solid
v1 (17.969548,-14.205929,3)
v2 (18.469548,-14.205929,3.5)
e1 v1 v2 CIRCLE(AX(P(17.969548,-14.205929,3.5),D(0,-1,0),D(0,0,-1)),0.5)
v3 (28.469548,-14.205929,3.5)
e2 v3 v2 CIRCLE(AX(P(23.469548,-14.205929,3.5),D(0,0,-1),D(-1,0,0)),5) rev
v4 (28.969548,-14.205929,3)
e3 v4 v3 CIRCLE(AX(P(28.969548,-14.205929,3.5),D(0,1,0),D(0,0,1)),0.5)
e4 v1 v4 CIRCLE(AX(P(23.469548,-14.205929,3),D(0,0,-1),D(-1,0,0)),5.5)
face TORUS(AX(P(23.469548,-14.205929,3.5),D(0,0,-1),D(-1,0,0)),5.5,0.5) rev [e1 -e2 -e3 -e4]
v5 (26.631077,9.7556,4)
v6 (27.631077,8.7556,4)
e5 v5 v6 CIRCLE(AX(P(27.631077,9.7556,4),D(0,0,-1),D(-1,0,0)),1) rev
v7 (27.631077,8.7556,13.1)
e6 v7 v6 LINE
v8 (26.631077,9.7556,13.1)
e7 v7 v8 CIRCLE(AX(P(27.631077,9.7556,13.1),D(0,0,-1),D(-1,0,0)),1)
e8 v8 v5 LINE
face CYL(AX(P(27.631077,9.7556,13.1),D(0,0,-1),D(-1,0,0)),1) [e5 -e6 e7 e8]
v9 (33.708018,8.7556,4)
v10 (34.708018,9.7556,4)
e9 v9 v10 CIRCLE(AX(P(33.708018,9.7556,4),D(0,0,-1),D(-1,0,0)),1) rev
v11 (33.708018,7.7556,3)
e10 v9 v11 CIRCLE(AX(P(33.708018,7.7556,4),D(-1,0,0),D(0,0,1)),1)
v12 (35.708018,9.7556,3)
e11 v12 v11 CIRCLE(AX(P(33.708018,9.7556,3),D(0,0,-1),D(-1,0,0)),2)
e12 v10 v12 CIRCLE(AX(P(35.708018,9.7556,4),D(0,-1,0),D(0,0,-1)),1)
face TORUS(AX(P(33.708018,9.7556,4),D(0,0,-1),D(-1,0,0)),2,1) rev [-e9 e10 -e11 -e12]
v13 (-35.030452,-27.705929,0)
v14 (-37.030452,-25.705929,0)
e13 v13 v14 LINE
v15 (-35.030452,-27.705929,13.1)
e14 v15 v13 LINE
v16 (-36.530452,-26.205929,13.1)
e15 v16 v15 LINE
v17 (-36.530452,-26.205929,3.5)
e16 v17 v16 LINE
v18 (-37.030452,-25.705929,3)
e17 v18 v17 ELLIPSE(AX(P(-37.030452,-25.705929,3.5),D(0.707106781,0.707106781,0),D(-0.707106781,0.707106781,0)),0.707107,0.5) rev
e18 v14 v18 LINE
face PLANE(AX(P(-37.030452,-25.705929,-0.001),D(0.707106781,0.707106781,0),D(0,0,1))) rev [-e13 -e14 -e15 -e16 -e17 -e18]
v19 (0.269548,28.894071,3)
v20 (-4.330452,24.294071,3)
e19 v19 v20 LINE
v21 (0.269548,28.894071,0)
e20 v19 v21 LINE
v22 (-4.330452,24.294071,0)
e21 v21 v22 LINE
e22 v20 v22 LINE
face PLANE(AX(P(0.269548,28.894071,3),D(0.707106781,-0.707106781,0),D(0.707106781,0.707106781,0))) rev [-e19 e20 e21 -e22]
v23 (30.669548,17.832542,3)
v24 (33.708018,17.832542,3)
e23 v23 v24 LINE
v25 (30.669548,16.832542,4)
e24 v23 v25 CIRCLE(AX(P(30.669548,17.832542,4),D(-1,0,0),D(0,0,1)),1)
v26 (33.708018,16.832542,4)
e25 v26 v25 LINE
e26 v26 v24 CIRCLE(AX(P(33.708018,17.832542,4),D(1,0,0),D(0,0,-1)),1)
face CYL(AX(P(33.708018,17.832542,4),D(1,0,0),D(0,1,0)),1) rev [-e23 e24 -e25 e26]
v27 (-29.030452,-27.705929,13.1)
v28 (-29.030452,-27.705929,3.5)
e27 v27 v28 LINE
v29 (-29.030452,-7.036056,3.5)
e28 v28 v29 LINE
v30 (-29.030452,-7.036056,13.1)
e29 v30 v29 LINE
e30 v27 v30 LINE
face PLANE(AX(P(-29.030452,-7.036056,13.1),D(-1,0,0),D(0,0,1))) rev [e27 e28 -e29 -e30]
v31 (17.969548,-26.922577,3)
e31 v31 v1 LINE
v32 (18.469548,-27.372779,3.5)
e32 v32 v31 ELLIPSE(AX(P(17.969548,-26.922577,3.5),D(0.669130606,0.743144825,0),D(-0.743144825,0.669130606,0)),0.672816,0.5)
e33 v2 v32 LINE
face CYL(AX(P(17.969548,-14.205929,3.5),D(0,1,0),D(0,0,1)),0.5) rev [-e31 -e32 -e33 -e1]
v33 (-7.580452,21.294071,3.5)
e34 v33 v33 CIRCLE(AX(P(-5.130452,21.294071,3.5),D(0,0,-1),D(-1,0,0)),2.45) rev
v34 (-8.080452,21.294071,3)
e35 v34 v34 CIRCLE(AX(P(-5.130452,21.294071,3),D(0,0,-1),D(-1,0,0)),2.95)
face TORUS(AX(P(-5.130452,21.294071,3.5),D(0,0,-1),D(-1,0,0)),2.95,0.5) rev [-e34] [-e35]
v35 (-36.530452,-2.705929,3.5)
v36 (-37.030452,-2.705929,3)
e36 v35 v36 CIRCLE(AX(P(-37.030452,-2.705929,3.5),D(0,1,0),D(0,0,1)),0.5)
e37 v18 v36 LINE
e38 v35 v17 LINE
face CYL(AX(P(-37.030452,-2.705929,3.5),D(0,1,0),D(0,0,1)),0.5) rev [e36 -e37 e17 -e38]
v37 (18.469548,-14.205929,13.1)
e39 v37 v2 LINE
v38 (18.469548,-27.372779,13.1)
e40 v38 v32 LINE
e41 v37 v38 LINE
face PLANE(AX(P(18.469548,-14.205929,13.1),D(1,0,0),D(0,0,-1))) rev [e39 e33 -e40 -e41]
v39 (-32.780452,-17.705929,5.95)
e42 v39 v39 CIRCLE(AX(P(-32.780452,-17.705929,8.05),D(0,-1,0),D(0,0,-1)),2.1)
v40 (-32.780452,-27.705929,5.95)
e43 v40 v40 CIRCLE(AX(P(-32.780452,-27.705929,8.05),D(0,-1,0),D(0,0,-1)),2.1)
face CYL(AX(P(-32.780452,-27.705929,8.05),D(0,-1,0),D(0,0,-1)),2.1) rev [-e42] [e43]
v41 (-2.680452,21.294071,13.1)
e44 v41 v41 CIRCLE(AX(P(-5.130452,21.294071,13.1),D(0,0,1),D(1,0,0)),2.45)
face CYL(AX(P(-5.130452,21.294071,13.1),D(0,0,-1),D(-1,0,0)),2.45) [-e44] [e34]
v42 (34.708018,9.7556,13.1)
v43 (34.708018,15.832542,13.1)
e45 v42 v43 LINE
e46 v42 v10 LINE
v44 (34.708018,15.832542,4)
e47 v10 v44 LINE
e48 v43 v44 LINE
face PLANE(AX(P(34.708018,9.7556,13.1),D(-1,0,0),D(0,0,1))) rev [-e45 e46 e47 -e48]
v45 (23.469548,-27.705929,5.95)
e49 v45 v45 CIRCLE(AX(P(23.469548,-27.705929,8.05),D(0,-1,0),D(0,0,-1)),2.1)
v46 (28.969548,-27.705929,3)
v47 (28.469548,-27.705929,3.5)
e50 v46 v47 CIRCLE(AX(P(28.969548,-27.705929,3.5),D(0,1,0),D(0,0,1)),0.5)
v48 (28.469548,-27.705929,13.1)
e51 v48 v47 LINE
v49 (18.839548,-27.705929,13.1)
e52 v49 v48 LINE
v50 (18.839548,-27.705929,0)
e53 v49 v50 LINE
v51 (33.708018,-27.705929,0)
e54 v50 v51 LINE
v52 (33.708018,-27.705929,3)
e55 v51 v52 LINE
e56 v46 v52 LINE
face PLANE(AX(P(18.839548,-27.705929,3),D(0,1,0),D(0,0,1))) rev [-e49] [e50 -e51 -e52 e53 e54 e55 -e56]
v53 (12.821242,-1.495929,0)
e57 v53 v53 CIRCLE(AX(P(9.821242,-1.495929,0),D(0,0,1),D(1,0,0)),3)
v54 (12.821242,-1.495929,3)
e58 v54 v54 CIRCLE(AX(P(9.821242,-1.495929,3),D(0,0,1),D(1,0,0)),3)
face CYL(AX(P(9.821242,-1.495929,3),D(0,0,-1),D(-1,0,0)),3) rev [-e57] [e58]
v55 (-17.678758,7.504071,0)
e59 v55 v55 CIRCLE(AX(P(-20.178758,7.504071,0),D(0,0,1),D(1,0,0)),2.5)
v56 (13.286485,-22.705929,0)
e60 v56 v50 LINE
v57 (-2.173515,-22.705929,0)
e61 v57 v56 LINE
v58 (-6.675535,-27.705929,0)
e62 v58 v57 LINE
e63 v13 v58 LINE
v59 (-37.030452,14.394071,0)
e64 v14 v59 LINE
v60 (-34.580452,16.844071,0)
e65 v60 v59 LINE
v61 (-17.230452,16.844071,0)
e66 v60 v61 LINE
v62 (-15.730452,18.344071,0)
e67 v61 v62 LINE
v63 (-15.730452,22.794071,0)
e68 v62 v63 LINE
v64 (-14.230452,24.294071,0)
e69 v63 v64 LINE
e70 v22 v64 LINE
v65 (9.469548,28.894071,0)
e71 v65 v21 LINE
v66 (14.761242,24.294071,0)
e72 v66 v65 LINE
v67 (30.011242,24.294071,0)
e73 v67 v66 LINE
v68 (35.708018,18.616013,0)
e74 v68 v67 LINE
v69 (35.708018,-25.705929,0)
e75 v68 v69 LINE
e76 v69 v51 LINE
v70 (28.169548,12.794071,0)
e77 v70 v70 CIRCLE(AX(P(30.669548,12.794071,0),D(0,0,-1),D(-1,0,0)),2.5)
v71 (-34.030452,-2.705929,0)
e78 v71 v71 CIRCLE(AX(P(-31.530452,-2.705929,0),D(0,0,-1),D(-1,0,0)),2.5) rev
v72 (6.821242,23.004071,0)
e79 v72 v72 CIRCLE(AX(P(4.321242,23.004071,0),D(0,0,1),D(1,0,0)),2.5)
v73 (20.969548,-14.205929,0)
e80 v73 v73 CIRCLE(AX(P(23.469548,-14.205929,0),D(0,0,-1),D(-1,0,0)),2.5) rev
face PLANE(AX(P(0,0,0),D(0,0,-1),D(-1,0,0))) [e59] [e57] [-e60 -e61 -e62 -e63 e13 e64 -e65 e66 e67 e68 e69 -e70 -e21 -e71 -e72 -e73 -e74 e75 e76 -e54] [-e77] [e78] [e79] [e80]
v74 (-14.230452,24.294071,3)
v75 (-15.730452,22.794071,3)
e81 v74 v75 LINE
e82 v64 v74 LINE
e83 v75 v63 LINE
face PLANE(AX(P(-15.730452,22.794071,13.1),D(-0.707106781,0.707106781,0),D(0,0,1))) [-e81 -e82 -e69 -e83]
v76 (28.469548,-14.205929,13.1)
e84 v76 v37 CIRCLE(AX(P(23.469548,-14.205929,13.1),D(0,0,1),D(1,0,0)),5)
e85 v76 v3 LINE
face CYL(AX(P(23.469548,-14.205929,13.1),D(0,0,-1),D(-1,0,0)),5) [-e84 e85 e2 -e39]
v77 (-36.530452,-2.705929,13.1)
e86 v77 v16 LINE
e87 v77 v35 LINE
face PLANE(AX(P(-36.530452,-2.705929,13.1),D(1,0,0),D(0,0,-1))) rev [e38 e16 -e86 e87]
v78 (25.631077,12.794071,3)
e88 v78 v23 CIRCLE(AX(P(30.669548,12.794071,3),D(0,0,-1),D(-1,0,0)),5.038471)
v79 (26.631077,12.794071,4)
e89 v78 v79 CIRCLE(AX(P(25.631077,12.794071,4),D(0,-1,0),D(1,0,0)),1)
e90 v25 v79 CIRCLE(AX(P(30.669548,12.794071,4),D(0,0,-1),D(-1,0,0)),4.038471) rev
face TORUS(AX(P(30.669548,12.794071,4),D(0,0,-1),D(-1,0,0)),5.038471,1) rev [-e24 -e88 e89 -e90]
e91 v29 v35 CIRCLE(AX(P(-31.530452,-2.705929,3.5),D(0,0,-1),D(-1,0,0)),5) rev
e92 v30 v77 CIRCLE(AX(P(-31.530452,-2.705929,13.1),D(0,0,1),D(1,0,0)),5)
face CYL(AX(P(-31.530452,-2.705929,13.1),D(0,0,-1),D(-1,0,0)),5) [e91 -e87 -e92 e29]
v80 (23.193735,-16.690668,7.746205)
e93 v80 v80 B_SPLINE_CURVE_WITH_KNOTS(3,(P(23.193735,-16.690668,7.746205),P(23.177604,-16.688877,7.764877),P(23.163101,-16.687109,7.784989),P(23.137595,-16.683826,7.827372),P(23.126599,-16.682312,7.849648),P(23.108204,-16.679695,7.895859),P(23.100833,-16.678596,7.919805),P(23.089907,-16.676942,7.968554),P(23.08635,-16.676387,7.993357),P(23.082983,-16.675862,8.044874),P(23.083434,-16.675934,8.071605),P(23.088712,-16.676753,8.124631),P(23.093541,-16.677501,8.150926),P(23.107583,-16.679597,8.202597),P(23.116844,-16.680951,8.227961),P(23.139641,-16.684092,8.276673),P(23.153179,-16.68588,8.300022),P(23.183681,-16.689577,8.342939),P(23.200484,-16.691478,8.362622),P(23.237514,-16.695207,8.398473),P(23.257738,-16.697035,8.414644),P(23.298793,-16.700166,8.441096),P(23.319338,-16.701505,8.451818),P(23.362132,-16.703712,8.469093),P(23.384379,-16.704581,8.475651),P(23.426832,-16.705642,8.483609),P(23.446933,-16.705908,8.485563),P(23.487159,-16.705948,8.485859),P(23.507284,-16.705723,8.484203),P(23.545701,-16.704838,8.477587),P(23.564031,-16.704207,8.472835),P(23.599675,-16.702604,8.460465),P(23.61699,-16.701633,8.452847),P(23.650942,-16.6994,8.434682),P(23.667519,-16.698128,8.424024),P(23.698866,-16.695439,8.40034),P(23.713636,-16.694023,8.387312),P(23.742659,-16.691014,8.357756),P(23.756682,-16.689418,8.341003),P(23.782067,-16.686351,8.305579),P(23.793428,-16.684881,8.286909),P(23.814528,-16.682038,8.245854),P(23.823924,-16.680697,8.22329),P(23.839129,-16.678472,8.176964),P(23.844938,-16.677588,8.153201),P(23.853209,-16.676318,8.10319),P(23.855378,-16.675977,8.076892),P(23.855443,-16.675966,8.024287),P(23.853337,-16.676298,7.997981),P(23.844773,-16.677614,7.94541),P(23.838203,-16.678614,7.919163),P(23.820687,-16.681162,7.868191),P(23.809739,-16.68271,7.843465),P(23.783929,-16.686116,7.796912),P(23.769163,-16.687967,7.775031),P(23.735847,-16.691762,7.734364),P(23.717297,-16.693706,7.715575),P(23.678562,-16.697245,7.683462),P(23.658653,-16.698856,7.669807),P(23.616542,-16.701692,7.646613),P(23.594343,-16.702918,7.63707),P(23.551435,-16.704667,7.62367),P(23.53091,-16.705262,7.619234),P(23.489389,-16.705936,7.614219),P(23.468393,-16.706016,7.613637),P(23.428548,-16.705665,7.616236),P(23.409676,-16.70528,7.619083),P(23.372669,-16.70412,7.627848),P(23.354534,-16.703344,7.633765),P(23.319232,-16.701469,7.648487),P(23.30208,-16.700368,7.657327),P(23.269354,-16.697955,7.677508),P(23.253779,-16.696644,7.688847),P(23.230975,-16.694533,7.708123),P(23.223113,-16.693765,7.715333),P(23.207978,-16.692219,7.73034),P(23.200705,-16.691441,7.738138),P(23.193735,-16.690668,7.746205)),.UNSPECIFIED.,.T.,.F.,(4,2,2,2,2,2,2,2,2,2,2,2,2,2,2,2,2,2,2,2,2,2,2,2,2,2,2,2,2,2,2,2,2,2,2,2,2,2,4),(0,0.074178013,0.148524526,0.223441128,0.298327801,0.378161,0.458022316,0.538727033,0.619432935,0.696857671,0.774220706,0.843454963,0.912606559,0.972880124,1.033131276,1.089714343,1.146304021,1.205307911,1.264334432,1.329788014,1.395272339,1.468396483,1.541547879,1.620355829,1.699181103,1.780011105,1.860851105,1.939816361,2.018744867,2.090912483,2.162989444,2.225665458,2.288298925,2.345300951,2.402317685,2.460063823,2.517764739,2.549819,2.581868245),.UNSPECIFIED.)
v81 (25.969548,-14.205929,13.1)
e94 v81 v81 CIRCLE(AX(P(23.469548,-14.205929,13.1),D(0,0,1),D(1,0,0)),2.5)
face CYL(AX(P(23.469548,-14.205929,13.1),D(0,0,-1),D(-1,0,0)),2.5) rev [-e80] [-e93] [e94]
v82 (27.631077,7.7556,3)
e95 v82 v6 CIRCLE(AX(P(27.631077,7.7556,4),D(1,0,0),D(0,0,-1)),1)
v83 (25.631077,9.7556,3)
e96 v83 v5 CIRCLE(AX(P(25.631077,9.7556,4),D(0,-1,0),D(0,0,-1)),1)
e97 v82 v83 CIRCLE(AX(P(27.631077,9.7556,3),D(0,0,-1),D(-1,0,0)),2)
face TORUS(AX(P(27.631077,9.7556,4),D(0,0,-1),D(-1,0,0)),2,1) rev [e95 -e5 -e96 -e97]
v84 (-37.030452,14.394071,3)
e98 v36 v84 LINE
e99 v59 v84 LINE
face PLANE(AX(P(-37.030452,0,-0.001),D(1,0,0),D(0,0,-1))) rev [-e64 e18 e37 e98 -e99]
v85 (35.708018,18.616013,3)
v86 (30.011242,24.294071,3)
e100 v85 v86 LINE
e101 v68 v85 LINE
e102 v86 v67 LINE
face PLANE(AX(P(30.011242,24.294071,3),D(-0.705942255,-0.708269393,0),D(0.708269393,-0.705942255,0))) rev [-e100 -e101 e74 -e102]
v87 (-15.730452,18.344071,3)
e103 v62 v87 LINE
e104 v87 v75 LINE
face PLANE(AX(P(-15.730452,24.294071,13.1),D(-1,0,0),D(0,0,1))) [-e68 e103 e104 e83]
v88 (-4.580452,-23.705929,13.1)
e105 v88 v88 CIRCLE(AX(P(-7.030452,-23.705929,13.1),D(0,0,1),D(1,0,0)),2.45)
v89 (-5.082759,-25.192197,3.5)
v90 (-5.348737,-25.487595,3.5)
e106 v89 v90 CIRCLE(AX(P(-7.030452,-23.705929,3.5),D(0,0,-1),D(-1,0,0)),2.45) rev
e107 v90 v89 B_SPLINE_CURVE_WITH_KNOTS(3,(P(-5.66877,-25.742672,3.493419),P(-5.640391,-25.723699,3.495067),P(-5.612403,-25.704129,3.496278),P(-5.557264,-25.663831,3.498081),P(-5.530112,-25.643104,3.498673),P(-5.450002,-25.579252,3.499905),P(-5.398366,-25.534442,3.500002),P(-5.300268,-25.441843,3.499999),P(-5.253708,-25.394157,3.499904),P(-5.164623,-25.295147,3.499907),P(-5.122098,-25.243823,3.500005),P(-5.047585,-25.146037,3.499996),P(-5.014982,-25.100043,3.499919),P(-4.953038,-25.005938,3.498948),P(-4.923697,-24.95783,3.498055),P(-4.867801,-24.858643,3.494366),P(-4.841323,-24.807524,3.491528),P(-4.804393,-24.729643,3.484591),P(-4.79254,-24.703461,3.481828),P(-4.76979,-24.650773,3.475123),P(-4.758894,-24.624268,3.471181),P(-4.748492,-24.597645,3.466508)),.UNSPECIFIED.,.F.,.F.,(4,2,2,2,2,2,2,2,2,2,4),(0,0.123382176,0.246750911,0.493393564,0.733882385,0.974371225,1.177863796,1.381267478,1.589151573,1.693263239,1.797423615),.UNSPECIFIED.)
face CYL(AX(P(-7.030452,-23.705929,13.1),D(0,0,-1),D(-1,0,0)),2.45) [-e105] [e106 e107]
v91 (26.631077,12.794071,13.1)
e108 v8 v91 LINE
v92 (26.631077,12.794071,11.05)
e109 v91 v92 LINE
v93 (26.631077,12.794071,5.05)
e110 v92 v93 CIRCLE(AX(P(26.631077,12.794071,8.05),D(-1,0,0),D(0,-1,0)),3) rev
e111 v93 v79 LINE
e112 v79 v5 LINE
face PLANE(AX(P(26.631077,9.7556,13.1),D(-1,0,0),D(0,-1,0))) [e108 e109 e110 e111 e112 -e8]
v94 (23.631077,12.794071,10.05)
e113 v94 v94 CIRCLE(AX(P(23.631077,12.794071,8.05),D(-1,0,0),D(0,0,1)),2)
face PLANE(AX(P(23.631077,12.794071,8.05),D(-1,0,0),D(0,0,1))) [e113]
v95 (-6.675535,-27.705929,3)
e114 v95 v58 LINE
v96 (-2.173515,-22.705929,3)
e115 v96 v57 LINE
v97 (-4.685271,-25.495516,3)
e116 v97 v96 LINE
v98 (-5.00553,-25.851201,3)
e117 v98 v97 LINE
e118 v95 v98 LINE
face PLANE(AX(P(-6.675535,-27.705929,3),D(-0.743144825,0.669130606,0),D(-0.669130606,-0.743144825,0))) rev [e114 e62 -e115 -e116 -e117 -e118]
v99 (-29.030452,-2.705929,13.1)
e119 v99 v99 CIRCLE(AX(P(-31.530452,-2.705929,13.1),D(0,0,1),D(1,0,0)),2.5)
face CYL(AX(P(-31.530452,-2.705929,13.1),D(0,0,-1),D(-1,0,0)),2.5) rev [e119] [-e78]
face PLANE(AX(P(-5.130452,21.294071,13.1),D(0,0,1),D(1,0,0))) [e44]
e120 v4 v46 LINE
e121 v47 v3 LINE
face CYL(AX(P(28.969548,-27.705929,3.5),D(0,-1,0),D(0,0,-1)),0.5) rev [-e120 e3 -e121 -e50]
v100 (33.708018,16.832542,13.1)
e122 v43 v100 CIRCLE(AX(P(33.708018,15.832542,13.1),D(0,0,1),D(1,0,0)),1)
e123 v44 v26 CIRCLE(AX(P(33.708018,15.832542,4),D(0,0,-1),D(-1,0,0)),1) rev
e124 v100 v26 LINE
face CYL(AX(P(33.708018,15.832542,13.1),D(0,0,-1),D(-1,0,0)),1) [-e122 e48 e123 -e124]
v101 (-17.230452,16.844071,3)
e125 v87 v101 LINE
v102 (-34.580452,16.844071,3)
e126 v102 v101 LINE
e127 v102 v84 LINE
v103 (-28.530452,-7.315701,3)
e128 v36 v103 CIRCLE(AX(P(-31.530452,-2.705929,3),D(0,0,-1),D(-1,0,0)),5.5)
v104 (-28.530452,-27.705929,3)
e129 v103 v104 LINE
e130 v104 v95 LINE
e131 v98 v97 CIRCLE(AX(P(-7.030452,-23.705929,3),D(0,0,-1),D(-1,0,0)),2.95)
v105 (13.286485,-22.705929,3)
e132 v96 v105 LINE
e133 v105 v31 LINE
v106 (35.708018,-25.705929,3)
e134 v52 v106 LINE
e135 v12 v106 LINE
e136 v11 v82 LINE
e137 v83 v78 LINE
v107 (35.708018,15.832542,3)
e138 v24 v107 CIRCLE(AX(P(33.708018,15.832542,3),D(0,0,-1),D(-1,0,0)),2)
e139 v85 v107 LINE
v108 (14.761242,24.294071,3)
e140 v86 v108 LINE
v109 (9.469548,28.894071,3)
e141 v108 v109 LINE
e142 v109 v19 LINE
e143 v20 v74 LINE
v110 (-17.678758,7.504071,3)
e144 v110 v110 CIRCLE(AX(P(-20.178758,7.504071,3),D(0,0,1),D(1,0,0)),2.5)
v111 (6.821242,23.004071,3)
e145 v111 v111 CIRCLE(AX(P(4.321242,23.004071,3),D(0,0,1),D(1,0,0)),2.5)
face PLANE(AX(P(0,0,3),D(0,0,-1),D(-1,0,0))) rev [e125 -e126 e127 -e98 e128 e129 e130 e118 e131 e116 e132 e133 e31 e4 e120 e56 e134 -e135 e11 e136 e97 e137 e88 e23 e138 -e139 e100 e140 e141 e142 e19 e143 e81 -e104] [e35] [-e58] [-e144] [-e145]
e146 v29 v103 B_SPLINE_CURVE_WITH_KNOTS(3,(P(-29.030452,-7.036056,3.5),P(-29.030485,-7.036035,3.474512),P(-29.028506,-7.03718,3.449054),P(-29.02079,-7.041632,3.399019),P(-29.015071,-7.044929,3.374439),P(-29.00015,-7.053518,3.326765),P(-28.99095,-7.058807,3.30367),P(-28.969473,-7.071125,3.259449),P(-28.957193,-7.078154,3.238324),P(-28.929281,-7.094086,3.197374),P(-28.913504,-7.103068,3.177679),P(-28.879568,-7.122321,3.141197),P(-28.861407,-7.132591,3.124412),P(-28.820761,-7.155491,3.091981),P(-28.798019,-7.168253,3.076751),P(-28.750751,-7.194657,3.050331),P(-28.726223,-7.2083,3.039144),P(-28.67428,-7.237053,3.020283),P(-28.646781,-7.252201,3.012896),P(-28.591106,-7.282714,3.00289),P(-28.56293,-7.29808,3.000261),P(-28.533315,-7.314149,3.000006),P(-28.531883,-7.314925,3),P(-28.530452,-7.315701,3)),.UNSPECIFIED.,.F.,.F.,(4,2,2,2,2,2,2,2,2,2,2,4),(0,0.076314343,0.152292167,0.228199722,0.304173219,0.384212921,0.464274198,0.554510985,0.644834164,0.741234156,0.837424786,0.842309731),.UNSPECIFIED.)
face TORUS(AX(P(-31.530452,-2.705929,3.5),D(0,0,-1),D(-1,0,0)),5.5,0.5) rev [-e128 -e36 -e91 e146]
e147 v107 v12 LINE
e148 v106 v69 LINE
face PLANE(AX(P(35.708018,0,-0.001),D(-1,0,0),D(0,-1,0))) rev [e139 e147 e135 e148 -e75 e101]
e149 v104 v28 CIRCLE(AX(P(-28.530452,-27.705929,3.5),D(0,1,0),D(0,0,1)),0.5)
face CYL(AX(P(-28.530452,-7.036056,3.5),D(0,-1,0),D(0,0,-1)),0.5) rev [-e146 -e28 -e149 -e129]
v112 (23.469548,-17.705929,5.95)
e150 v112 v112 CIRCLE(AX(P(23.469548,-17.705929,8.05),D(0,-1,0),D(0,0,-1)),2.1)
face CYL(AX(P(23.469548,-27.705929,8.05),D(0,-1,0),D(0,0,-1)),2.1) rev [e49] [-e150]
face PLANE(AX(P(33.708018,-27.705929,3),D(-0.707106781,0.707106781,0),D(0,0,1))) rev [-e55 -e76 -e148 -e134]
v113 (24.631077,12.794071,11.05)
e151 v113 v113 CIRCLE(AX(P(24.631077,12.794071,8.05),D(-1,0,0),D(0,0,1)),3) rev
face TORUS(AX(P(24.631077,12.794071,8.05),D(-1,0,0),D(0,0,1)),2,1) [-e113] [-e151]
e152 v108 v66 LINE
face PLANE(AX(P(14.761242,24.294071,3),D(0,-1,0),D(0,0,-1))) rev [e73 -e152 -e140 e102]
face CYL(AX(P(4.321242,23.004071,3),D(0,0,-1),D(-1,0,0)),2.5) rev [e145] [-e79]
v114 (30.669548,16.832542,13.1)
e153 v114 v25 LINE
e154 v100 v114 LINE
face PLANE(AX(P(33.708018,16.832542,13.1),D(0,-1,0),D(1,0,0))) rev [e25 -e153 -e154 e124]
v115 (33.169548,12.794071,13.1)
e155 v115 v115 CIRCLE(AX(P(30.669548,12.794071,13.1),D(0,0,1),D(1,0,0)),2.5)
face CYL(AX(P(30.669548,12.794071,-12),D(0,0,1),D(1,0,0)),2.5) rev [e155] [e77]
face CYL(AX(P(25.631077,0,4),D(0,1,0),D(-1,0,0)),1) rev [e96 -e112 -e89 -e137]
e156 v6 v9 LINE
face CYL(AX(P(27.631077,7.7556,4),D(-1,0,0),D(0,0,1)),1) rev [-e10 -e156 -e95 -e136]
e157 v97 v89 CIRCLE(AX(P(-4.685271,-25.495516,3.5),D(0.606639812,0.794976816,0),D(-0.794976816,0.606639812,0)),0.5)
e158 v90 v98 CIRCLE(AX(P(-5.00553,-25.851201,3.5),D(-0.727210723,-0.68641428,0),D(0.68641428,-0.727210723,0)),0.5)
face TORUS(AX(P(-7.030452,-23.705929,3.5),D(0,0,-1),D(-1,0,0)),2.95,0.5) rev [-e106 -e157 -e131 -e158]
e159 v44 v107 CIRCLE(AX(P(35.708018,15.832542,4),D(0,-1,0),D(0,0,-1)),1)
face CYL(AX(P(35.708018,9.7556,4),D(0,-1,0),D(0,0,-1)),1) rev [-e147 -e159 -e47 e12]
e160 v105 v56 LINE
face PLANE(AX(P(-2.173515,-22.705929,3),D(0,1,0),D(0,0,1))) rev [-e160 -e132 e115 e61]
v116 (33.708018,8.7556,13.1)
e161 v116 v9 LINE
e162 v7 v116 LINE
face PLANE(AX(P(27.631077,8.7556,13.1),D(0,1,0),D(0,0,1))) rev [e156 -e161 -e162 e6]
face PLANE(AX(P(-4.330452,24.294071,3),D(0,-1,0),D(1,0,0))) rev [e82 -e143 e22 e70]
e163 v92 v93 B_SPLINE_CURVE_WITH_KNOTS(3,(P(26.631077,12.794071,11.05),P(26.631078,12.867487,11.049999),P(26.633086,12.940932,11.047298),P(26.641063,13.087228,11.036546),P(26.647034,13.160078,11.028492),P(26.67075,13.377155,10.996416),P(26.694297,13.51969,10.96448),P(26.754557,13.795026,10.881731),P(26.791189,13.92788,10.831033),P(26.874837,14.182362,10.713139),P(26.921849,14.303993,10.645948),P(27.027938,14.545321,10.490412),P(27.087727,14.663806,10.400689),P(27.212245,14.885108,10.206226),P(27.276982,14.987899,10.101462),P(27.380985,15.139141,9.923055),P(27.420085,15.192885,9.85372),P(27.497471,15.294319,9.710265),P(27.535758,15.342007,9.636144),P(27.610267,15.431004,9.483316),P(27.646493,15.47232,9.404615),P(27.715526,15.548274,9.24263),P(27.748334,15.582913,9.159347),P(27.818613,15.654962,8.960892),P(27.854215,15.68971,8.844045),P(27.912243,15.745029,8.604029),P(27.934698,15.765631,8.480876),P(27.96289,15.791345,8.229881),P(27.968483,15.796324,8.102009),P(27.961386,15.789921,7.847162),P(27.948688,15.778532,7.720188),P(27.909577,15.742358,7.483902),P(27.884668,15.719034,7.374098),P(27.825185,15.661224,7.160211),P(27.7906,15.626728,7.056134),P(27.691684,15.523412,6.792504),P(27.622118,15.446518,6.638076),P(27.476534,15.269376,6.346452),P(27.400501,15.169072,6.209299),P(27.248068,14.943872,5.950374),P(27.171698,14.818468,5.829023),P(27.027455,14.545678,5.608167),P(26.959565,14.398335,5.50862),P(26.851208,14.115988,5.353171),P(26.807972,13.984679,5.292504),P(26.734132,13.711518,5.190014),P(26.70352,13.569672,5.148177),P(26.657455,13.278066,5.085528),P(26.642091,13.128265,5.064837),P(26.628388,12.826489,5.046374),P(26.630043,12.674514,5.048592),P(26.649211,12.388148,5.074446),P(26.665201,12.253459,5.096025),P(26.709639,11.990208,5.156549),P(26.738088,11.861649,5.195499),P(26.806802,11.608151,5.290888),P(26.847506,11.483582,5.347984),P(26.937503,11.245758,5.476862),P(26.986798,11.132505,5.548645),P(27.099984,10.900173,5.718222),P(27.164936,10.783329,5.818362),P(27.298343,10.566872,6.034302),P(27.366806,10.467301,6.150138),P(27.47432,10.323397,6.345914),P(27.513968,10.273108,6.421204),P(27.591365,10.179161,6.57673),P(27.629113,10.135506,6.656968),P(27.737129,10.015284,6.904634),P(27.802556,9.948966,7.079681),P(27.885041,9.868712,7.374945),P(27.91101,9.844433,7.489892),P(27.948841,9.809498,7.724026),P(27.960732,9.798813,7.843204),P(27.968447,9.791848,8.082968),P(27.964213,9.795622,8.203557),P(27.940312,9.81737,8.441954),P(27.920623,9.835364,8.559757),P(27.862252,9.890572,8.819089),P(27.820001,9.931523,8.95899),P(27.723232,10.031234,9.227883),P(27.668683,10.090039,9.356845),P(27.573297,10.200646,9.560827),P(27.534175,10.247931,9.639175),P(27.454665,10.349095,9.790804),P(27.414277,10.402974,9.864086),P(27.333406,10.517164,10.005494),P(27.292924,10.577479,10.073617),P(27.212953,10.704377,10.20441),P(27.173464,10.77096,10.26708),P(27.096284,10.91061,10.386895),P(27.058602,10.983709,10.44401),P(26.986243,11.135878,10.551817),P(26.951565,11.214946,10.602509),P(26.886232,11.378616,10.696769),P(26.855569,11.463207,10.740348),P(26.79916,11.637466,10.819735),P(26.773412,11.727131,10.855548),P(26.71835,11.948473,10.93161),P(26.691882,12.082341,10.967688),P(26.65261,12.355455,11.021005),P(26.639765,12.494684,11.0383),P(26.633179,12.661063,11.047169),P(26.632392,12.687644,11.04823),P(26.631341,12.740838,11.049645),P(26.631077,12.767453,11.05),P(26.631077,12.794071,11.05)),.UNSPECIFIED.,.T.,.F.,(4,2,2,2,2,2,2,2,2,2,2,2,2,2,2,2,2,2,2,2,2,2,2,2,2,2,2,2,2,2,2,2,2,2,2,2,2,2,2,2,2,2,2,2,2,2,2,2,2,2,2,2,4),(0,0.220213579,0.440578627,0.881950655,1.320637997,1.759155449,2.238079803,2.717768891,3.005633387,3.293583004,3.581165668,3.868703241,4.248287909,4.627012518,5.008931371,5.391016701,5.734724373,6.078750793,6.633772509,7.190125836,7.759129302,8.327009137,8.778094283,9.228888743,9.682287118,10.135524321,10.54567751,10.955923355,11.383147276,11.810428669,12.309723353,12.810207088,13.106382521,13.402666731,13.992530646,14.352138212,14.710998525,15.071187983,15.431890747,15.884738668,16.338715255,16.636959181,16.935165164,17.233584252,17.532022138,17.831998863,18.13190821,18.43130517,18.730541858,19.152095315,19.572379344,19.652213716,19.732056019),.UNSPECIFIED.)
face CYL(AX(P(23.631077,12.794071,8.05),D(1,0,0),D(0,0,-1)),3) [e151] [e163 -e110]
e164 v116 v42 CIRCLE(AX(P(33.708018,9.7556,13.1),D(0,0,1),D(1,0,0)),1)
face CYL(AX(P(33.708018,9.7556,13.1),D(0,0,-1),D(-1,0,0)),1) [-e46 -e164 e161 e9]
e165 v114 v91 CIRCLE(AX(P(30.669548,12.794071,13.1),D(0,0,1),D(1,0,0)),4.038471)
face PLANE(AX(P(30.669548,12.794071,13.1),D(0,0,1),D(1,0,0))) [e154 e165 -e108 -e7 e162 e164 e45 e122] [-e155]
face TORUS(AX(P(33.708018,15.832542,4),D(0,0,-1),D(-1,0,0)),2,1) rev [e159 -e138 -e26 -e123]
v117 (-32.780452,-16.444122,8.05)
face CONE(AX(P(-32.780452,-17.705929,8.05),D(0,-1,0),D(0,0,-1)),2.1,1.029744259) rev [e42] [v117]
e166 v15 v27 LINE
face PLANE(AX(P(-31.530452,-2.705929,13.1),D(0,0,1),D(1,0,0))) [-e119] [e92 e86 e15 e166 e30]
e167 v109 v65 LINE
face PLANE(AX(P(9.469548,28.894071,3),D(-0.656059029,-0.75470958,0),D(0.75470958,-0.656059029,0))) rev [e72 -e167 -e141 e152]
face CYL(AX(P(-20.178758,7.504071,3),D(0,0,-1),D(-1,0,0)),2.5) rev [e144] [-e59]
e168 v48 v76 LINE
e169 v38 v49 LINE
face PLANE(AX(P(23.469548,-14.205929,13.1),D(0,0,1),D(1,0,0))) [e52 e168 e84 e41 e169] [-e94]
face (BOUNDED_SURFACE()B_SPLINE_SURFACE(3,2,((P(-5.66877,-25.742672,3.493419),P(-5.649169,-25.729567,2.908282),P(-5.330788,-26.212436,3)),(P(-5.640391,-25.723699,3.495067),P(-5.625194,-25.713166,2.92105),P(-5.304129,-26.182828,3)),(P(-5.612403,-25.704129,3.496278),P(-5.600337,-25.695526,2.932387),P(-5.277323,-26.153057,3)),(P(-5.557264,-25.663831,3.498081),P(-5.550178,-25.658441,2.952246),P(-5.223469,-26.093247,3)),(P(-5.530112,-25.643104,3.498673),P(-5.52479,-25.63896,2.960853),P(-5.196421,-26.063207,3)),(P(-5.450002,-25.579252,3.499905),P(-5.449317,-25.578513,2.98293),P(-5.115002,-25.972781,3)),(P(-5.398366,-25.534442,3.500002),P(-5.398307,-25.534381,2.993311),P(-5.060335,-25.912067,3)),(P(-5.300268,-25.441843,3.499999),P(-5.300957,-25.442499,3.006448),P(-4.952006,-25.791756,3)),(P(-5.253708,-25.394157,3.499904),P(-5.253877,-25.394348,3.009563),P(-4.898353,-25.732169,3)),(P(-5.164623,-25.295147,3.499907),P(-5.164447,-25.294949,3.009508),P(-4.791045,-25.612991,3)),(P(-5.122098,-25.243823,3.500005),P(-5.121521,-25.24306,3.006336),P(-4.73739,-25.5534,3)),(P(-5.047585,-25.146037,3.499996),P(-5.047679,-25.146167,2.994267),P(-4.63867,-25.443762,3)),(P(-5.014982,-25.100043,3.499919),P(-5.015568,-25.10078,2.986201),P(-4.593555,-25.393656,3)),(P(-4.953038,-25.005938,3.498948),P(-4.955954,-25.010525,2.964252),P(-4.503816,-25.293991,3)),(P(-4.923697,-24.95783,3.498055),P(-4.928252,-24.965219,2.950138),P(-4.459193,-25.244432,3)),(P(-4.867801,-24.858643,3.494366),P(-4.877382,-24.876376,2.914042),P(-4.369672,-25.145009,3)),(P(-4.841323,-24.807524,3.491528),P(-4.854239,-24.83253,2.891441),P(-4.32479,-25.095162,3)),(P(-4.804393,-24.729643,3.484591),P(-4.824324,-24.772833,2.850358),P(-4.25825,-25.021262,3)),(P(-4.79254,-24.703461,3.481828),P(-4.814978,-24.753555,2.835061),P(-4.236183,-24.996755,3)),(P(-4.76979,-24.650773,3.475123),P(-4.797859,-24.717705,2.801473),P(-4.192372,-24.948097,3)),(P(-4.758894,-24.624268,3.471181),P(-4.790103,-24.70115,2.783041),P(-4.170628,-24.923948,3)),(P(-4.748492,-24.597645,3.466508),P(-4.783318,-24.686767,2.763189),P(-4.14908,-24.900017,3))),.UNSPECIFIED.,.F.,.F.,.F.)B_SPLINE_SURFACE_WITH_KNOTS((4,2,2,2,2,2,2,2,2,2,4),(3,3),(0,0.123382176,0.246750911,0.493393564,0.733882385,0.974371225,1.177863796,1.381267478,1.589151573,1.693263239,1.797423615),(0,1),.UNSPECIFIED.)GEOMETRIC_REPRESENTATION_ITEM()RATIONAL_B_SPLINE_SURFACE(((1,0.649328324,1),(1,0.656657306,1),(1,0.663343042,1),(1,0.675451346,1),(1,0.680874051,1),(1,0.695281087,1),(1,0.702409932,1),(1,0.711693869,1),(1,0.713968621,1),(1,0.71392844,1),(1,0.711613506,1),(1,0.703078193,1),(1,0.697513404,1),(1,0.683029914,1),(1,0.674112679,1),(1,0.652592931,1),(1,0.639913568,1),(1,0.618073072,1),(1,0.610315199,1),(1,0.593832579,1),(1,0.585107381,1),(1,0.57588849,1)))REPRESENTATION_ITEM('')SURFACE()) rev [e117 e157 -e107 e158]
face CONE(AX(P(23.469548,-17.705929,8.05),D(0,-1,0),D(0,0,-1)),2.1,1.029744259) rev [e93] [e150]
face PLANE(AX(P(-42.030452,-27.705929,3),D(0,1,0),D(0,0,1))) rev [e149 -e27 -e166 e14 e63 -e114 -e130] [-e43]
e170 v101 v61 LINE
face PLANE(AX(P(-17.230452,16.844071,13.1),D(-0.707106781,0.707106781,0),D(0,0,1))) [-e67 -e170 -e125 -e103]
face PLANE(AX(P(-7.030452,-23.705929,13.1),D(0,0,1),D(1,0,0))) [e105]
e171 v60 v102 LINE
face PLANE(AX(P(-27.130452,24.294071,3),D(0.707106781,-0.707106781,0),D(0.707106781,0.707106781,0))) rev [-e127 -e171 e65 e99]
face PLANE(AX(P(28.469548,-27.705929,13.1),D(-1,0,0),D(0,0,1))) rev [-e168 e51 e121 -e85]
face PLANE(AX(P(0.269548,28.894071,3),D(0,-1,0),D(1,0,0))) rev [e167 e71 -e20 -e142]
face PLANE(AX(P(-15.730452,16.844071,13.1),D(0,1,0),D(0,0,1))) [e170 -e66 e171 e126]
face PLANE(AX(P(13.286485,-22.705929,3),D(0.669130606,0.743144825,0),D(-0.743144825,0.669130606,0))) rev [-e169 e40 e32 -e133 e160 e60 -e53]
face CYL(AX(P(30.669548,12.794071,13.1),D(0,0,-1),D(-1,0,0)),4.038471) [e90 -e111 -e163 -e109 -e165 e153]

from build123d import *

# Parameters (mm, degrees)
SKETCH_1_R                      = 2.5
SKETCH_1_R_2                    = 3
EXTRUDE_1_DEPTH                 = 3
SKETCH_2_R                      = 2.45
SKETCH_2_R_2                    = 2.5
EXTRUDE_3_DEPTH                 = 10.1
CUT_EXTRUDE_START               = -3
CUT_EXTRUDE_1_OUTLINE_R         = 2.5
CUT_EXTRUDE_1_DEPTH             = 3
FILLET_1_R                      = 0.5
EXTRUDE_4_DEPTH                 = 10.1
SKETCH_4_R                      = 3
EXTRUDE_5_DEPTH                 = 3
FILLET_2_R                      = 1
FILLET_4_R                      = 1
SKETCH_5_R                      = 2.5
CUT_EXTRUDE_2_DEPTH             = 15
CHAMFER_1_SIZE                  = 1
CUT_EXTRUDE_3_REACH             = 53.995
CUT_EXTRUDE_3_DIRECTION_2_DEPTH = 52.994579065
CHAMFER_2_SIZE                  = 1.5
CUT_EXTRUDE_5_REACH             = 53.995
CHAMFER_3_SIZE                  = 2
HOLE_WIZARD_M5_2_D              = 4.2
HOLE_WIZARD_M5_2_DEPTH          = 10
HOLE_WIZARD_M5_2_TIP            = 1.2618073


# Read off the part's stored shape, not the designer's step: 컷-돌출1
with BuildPart() as part:
    # 스케치1 → 보스-돌출1 (new body)
    with BuildSketch(Plane.XY):
        Polygon((-6.675534975, -27.705928987), (-2.173514753, -22.705928987), (13.286485247, -22.705928987), (18.839547821, -27.705928987), (41.669547821, -27.705928987), (41.669547821, 12.674071013), (30.011242494, 24.294071013), (14.761242494, 24.294071013), (9.469547821, 28.894071013), (0.269547821, 28.894071013), (-4.330452179, 24.294071013), (-27.130452179, 24.294071013), (-42.030452179, 9.394071013), (-42.030452179, -27.705928987), align=None)
        with Locations((-20.178757506, 7.504071013)):
            Circle(SKETCH_1_R, mode=Mode.SUBTRACT)
        with Locations((4.321242494, 23.004071013)):
            Circle(SKETCH_1_R, mode=Mode.SUBTRACT)
        with Locations((9.821242494, -1.495928987)):
            Circle(SKETCH_1_R_2, mode=Mode.SUBTRACT)
    extrude(amount=EXTRUDE_1_DEPTH)

    # 스케치2 → 보스-돌출3 (add)
    # profile 1 of 4: a face of its own
    with BuildSketch(Plane.XY.offset(3)):
        with Locations(Location((-5.130452179, 21.294071013, 0), (0, 0, 180))):
            Circle(SKETCH_2_R)
    # profile 2 of 4: a face of its own
    with BuildSketch(Plane.XY.offset(3)):
        with Locations(Location((-7.030452179, -23.705928987, 0), (0, 0, 180))):
            Circle(SKETCH_2_R)
    # profile 3 of 4: a face of its own
    with BuildSketch(Plane.XY.offset(3)):
        with BuildLine():
            Line((18.469547821, -14.205928987), (18.469547821, -27.37277949))
            Line((18.469547821, -27.37277949), (18.839547821, -27.705928987))
            Line((18.839547821, -27.705928987), (28.469547821, -27.705928987))
            Line((28.469547821, -27.705928987), (28.469547821, -14.205928987))
            ThreePointArc((28.469547821, -14.205928987), (23.469547821, -9.205928987), (18.469547821, -14.205928987))
        make_face()
        with Locations((23.469547821, -14.205928987)):
            Circle(SKETCH_2_R_2, mode=Mode.SUBTRACT)
    # profile 4 of 4: a face of its own
    with BuildSketch(Plane.XY.offset(3)):
        with BuildLine():
            Line((-36.530452179, -2.705928987), (-36.530452179, -27.705928987))
            Line((-36.530452179, -27.705928987), (-29.030452179, -27.705928987))
            Line((-29.030452179, -27.705928987), (-29.030452179, -7.036056006))
            ThreePointArc((-29.030452179, -7.036056006), (-29.030452179, 1.624198032), (-36.530452179, -2.705928987))
        make_face()
        with Locations((-31.530452179, -2.705928987)):
            Circle(SKETCH_2_R_2, mode=Mode.SUBTRACT)
    extrude(amount=EXTRUDE_3_DEPTH)

    # 컷-돌출1 outline → 컷-돌출1 (cut)
    with BuildSketch(Plane.XY.offset(3).offset(CUT_EXTRUDE_START)):
        with Locations((-31.530452179, -2.705928987)):
            Circle(CUT_EXTRUDE_1_OUTLINE_R)
        with Locations((23.469547821, -14.205928987)):
            Circle(CUT_EXTRUDE_1_OUTLINE_R)
    extrude(amount=CUT_EXTRUDE_1_DEPTH, mode=Mode.SUBTRACT)

    # 필렛1
    fillet_1_edges = [part.edges().sort_by_distance(p)[0] for p in [
        (23.469547821, -9.205928987, 3),
        (-2.680452179, 21.294071013, 3),
        (-4.580452179, -23.705928987, 3),
        (28.469547821, -20.955928987, 3),
        (18.469547821, -20.789354238, 3),
        (-36.530452179, -15.205928987, 3),
        (-29.030452179, -17.370992496, 3),
        (-29.030452179, 1.624198032, 3),
    ]]
    fillet(fillet_1_edges, radius=FILLET_1_R)

    # 스케치3 → 보스-돌출4 (add)
    with BuildSketch(Plane.XY.offset(3)):
        with BuildLine():
            Line((27.631077151, 8.755600344), (33.70801849, 8.755600344))
            ThreePointArc((33.70801849, 8.755600344), (34.415125271, 9.048493563), (34.70801849, 9.755600344))
            Line((34.70801849, 9.755600344), (34.70801849, 15.832541683))
            ThreePointArc((34.70801849, 15.832541683), (34.415125271, 16.539648464), (33.70801849, 16.832541683))
            Line((33.70801849, 16.832541683), (30.669547821, 16.832541683))
            ThreePointArc((30.669547821, 16.832541683), (27.813917825, 15.649701009), (26.631077151, 12.794071013))
            Line((26.631077151, 12.794071013), (26.631077151, 9.755600344))
            ThreePointArc((26.631077151, 9.755600344), (26.92397037, 9.048493563), (27.631077151, 8.755600344))
        make_face()
    extrude(amount=EXTRUDE_4_DEPTH)

    # 스케치4 → 보스-돌출5 (add, symmetric)
    with BuildSketch(Plane.ZY.offset(-26.631077151)):
        with Locations((8.05, 12.794071013)):
            Circle(SKETCH_4_R)
    extrude(amount=EXTRUDE_5_DEPTH, both=True)

    # 필렛2
    fillet_2_edges = [part.edges().sort_by_distance(p)[0] for p in [
        (23.631077151, 12.794071013, 5.05),
    ]]
    fillet(fillet_2_edges, radius=FILLET_2_R)

    # 필렛4
    fillet_4_edges = [part.edges().sort_by_distance(p)[0] for p in [
        (32.188783155, 16.832541683, 3),
        (27.813917825, 15.649701009, 3),
        (30.669547821, 8.755600344, 3),
        (34.415125271, 9.048493563, 3),
        (34.70801849, 12.794071013, 3),
        (34.415125271, 16.539648464, 3),
        (26.92397037, 9.048493563, 3),
        (26.631077151, 11.274835679, 3),
    ]]
    fillet(fillet_4_edges, radius=FILLET_4_R)

    # 스케치5 → 컷-돌출2 (cut, symmetric)
    with BuildSketch(Plane.XY.offset(3)):
        with Locations((30.669547821, 12.794071013)):
            Circle(SKETCH_5_R)
    extrude(amount=CUT_EXTRUDE_2_DEPTH, both=True, mode=Mode.SUBTRACT)

    # 모따기1
    chamfer_1_edges = [part.edges().sort_by_distance(p)[0] for p in [
        (41.669547821, -27.705928987, 1.5),
        (-42.030452179, -27.705928987, 1.5),
    ]]
    chamfer(chamfer_1_edges, length=CHAMFER_1_SIZE)

    # 스케치8 → 컷-돌출3 (cut, up to next)
    with BuildSketch(Plane.XY.offset(3), mode=Mode.PRIVATE) as cut_extrude_3_sk1:
        Polygon((-15.730452179, 24.294071013), (-15.730452179, 16.844071013), (-34.580452179, 16.844071013), (-27.130452179, 24.294071013), align=None)
    cut_extrude_3_tool1 = extrude(cut_extrude_3_sk1.sketch, amount=-CUT_EXTRUDE_3_REACH, mode=Mode.PRIVATE) & part.part
    add(cut_extrude_3_tool1.solids().sort_by_distance((-23.445852, 20.263272, 3))[0], mode=Mode.SUBTRACT)

    # 스케치8 → 컷-돌출3 direction 2 (cut)
    with BuildSketch(Plane.XY.offset(3)):
        Polygon((-15.730452179, 24.294071013), (-15.730452179, 16.844071013), (-34.580452179, 16.844071013), (-27.130452179, 24.294071013), align=None)
    extrude(amount=CUT_EXTRUDE_3_DIRECTION_2_DEPTH, mode=Mode.SUBTRACT)

    # 모따기2
    chamfer_2_edges = [part.edges().sort_by_distance(p)[0] for p in [
        (-15.730452179, 16.844071013, 1.5),
        (-15.730452179, 24.294071013, 1.5),
    ]]
    chamfer(chamfer_2_edges, length=CHAMFER_2_SIZE)

    # 스케치10 → 컷-돌출5 (cut, up to next)
    with BuildSketch(Plane.XY.offset(3), mode=Mode.PRIVATE) as cut_extrude_5_sk1:
        Polygon((35.708018491, 18.616012734), (35.708018491, -27.705928987), (40.669547821, -27.705928987), (41.669547821, -26.705928987), (41.669547821, 12.674071013), align=None)
    cut_extrude_5_tool1 = extrude(cut_extrude_5_sk1.sketch, amount=-CUT_EXTRUDE_5_REACH, mode=Mode.PRIVATE) & part.part
    # 스케치10 → 컷-돌출5 (cut, up to next)
    with BuildSketch(Plane.XY.offset(3), mode=Mode.PRIVATE) as cut_extrude_5_sk2:
        Polygon((-37.030452179, -2.705928987), (-37.030452179, 14.394071013), (-42.030452179, 9.394071013), (-42.030452179, -26.705928987), (-41.030452179, -27.705928987), (-37.030452179, -27.705928987), align=None)
    cut_extrude_5_tool2 = extrude(cut_extrude_5_sk2.sketch, amount=-CUT_EXTRUDE_5_REACH, mode=Mode.PRIVATE) & part.part
    add(cut_extrude_5_tool1.solids().sort_by_distance((38.615426, -5.955072, 3))[0], mode=Mode.SUBTRACT)
    add(cut_extrude_5_tool2.solids().sort_by_distance((-39.472224, -7.830275, 3))[0], mode=Mode.SUBTRACT)

    # 모따기3
    chamfer_3_edges = [part.edges().sort_by_distance(p)[0] for p in [
        (-37.030452179, -27.705928987, 1.5),
        (35.708018491, -27.705928987, 1.5),
    ]]
    chamfer(chamfer_3_edges, length=CHAMFER_3_SIZE)

    # M5 나사 구멍2
    with Locations(Plane(origin=(23.469547821, -27.705928987, 8.05), x_dir=(0, 0, -1), z_dir=(0, -1, 0))):
        with Locations((0, 0), (0, -56.25)):
            Hole(HOLE_WIZARD_M5_2_D / 2, depth=HOLE_WIZARD_M5_2_DEPTH)
            with Locations((0, 0, -(HOLE_WIZARD_M5_2_DEPTH + HOLE_WIZARD_M5_2_TIP / 2))):  # 118° drill point
                Cone(0, HOLE_WIZARD_M5_2_D / 2, HOLE_WIZARD_M5_2_TIP, mode=Mode.SUBTRACT)


solid = part.part
